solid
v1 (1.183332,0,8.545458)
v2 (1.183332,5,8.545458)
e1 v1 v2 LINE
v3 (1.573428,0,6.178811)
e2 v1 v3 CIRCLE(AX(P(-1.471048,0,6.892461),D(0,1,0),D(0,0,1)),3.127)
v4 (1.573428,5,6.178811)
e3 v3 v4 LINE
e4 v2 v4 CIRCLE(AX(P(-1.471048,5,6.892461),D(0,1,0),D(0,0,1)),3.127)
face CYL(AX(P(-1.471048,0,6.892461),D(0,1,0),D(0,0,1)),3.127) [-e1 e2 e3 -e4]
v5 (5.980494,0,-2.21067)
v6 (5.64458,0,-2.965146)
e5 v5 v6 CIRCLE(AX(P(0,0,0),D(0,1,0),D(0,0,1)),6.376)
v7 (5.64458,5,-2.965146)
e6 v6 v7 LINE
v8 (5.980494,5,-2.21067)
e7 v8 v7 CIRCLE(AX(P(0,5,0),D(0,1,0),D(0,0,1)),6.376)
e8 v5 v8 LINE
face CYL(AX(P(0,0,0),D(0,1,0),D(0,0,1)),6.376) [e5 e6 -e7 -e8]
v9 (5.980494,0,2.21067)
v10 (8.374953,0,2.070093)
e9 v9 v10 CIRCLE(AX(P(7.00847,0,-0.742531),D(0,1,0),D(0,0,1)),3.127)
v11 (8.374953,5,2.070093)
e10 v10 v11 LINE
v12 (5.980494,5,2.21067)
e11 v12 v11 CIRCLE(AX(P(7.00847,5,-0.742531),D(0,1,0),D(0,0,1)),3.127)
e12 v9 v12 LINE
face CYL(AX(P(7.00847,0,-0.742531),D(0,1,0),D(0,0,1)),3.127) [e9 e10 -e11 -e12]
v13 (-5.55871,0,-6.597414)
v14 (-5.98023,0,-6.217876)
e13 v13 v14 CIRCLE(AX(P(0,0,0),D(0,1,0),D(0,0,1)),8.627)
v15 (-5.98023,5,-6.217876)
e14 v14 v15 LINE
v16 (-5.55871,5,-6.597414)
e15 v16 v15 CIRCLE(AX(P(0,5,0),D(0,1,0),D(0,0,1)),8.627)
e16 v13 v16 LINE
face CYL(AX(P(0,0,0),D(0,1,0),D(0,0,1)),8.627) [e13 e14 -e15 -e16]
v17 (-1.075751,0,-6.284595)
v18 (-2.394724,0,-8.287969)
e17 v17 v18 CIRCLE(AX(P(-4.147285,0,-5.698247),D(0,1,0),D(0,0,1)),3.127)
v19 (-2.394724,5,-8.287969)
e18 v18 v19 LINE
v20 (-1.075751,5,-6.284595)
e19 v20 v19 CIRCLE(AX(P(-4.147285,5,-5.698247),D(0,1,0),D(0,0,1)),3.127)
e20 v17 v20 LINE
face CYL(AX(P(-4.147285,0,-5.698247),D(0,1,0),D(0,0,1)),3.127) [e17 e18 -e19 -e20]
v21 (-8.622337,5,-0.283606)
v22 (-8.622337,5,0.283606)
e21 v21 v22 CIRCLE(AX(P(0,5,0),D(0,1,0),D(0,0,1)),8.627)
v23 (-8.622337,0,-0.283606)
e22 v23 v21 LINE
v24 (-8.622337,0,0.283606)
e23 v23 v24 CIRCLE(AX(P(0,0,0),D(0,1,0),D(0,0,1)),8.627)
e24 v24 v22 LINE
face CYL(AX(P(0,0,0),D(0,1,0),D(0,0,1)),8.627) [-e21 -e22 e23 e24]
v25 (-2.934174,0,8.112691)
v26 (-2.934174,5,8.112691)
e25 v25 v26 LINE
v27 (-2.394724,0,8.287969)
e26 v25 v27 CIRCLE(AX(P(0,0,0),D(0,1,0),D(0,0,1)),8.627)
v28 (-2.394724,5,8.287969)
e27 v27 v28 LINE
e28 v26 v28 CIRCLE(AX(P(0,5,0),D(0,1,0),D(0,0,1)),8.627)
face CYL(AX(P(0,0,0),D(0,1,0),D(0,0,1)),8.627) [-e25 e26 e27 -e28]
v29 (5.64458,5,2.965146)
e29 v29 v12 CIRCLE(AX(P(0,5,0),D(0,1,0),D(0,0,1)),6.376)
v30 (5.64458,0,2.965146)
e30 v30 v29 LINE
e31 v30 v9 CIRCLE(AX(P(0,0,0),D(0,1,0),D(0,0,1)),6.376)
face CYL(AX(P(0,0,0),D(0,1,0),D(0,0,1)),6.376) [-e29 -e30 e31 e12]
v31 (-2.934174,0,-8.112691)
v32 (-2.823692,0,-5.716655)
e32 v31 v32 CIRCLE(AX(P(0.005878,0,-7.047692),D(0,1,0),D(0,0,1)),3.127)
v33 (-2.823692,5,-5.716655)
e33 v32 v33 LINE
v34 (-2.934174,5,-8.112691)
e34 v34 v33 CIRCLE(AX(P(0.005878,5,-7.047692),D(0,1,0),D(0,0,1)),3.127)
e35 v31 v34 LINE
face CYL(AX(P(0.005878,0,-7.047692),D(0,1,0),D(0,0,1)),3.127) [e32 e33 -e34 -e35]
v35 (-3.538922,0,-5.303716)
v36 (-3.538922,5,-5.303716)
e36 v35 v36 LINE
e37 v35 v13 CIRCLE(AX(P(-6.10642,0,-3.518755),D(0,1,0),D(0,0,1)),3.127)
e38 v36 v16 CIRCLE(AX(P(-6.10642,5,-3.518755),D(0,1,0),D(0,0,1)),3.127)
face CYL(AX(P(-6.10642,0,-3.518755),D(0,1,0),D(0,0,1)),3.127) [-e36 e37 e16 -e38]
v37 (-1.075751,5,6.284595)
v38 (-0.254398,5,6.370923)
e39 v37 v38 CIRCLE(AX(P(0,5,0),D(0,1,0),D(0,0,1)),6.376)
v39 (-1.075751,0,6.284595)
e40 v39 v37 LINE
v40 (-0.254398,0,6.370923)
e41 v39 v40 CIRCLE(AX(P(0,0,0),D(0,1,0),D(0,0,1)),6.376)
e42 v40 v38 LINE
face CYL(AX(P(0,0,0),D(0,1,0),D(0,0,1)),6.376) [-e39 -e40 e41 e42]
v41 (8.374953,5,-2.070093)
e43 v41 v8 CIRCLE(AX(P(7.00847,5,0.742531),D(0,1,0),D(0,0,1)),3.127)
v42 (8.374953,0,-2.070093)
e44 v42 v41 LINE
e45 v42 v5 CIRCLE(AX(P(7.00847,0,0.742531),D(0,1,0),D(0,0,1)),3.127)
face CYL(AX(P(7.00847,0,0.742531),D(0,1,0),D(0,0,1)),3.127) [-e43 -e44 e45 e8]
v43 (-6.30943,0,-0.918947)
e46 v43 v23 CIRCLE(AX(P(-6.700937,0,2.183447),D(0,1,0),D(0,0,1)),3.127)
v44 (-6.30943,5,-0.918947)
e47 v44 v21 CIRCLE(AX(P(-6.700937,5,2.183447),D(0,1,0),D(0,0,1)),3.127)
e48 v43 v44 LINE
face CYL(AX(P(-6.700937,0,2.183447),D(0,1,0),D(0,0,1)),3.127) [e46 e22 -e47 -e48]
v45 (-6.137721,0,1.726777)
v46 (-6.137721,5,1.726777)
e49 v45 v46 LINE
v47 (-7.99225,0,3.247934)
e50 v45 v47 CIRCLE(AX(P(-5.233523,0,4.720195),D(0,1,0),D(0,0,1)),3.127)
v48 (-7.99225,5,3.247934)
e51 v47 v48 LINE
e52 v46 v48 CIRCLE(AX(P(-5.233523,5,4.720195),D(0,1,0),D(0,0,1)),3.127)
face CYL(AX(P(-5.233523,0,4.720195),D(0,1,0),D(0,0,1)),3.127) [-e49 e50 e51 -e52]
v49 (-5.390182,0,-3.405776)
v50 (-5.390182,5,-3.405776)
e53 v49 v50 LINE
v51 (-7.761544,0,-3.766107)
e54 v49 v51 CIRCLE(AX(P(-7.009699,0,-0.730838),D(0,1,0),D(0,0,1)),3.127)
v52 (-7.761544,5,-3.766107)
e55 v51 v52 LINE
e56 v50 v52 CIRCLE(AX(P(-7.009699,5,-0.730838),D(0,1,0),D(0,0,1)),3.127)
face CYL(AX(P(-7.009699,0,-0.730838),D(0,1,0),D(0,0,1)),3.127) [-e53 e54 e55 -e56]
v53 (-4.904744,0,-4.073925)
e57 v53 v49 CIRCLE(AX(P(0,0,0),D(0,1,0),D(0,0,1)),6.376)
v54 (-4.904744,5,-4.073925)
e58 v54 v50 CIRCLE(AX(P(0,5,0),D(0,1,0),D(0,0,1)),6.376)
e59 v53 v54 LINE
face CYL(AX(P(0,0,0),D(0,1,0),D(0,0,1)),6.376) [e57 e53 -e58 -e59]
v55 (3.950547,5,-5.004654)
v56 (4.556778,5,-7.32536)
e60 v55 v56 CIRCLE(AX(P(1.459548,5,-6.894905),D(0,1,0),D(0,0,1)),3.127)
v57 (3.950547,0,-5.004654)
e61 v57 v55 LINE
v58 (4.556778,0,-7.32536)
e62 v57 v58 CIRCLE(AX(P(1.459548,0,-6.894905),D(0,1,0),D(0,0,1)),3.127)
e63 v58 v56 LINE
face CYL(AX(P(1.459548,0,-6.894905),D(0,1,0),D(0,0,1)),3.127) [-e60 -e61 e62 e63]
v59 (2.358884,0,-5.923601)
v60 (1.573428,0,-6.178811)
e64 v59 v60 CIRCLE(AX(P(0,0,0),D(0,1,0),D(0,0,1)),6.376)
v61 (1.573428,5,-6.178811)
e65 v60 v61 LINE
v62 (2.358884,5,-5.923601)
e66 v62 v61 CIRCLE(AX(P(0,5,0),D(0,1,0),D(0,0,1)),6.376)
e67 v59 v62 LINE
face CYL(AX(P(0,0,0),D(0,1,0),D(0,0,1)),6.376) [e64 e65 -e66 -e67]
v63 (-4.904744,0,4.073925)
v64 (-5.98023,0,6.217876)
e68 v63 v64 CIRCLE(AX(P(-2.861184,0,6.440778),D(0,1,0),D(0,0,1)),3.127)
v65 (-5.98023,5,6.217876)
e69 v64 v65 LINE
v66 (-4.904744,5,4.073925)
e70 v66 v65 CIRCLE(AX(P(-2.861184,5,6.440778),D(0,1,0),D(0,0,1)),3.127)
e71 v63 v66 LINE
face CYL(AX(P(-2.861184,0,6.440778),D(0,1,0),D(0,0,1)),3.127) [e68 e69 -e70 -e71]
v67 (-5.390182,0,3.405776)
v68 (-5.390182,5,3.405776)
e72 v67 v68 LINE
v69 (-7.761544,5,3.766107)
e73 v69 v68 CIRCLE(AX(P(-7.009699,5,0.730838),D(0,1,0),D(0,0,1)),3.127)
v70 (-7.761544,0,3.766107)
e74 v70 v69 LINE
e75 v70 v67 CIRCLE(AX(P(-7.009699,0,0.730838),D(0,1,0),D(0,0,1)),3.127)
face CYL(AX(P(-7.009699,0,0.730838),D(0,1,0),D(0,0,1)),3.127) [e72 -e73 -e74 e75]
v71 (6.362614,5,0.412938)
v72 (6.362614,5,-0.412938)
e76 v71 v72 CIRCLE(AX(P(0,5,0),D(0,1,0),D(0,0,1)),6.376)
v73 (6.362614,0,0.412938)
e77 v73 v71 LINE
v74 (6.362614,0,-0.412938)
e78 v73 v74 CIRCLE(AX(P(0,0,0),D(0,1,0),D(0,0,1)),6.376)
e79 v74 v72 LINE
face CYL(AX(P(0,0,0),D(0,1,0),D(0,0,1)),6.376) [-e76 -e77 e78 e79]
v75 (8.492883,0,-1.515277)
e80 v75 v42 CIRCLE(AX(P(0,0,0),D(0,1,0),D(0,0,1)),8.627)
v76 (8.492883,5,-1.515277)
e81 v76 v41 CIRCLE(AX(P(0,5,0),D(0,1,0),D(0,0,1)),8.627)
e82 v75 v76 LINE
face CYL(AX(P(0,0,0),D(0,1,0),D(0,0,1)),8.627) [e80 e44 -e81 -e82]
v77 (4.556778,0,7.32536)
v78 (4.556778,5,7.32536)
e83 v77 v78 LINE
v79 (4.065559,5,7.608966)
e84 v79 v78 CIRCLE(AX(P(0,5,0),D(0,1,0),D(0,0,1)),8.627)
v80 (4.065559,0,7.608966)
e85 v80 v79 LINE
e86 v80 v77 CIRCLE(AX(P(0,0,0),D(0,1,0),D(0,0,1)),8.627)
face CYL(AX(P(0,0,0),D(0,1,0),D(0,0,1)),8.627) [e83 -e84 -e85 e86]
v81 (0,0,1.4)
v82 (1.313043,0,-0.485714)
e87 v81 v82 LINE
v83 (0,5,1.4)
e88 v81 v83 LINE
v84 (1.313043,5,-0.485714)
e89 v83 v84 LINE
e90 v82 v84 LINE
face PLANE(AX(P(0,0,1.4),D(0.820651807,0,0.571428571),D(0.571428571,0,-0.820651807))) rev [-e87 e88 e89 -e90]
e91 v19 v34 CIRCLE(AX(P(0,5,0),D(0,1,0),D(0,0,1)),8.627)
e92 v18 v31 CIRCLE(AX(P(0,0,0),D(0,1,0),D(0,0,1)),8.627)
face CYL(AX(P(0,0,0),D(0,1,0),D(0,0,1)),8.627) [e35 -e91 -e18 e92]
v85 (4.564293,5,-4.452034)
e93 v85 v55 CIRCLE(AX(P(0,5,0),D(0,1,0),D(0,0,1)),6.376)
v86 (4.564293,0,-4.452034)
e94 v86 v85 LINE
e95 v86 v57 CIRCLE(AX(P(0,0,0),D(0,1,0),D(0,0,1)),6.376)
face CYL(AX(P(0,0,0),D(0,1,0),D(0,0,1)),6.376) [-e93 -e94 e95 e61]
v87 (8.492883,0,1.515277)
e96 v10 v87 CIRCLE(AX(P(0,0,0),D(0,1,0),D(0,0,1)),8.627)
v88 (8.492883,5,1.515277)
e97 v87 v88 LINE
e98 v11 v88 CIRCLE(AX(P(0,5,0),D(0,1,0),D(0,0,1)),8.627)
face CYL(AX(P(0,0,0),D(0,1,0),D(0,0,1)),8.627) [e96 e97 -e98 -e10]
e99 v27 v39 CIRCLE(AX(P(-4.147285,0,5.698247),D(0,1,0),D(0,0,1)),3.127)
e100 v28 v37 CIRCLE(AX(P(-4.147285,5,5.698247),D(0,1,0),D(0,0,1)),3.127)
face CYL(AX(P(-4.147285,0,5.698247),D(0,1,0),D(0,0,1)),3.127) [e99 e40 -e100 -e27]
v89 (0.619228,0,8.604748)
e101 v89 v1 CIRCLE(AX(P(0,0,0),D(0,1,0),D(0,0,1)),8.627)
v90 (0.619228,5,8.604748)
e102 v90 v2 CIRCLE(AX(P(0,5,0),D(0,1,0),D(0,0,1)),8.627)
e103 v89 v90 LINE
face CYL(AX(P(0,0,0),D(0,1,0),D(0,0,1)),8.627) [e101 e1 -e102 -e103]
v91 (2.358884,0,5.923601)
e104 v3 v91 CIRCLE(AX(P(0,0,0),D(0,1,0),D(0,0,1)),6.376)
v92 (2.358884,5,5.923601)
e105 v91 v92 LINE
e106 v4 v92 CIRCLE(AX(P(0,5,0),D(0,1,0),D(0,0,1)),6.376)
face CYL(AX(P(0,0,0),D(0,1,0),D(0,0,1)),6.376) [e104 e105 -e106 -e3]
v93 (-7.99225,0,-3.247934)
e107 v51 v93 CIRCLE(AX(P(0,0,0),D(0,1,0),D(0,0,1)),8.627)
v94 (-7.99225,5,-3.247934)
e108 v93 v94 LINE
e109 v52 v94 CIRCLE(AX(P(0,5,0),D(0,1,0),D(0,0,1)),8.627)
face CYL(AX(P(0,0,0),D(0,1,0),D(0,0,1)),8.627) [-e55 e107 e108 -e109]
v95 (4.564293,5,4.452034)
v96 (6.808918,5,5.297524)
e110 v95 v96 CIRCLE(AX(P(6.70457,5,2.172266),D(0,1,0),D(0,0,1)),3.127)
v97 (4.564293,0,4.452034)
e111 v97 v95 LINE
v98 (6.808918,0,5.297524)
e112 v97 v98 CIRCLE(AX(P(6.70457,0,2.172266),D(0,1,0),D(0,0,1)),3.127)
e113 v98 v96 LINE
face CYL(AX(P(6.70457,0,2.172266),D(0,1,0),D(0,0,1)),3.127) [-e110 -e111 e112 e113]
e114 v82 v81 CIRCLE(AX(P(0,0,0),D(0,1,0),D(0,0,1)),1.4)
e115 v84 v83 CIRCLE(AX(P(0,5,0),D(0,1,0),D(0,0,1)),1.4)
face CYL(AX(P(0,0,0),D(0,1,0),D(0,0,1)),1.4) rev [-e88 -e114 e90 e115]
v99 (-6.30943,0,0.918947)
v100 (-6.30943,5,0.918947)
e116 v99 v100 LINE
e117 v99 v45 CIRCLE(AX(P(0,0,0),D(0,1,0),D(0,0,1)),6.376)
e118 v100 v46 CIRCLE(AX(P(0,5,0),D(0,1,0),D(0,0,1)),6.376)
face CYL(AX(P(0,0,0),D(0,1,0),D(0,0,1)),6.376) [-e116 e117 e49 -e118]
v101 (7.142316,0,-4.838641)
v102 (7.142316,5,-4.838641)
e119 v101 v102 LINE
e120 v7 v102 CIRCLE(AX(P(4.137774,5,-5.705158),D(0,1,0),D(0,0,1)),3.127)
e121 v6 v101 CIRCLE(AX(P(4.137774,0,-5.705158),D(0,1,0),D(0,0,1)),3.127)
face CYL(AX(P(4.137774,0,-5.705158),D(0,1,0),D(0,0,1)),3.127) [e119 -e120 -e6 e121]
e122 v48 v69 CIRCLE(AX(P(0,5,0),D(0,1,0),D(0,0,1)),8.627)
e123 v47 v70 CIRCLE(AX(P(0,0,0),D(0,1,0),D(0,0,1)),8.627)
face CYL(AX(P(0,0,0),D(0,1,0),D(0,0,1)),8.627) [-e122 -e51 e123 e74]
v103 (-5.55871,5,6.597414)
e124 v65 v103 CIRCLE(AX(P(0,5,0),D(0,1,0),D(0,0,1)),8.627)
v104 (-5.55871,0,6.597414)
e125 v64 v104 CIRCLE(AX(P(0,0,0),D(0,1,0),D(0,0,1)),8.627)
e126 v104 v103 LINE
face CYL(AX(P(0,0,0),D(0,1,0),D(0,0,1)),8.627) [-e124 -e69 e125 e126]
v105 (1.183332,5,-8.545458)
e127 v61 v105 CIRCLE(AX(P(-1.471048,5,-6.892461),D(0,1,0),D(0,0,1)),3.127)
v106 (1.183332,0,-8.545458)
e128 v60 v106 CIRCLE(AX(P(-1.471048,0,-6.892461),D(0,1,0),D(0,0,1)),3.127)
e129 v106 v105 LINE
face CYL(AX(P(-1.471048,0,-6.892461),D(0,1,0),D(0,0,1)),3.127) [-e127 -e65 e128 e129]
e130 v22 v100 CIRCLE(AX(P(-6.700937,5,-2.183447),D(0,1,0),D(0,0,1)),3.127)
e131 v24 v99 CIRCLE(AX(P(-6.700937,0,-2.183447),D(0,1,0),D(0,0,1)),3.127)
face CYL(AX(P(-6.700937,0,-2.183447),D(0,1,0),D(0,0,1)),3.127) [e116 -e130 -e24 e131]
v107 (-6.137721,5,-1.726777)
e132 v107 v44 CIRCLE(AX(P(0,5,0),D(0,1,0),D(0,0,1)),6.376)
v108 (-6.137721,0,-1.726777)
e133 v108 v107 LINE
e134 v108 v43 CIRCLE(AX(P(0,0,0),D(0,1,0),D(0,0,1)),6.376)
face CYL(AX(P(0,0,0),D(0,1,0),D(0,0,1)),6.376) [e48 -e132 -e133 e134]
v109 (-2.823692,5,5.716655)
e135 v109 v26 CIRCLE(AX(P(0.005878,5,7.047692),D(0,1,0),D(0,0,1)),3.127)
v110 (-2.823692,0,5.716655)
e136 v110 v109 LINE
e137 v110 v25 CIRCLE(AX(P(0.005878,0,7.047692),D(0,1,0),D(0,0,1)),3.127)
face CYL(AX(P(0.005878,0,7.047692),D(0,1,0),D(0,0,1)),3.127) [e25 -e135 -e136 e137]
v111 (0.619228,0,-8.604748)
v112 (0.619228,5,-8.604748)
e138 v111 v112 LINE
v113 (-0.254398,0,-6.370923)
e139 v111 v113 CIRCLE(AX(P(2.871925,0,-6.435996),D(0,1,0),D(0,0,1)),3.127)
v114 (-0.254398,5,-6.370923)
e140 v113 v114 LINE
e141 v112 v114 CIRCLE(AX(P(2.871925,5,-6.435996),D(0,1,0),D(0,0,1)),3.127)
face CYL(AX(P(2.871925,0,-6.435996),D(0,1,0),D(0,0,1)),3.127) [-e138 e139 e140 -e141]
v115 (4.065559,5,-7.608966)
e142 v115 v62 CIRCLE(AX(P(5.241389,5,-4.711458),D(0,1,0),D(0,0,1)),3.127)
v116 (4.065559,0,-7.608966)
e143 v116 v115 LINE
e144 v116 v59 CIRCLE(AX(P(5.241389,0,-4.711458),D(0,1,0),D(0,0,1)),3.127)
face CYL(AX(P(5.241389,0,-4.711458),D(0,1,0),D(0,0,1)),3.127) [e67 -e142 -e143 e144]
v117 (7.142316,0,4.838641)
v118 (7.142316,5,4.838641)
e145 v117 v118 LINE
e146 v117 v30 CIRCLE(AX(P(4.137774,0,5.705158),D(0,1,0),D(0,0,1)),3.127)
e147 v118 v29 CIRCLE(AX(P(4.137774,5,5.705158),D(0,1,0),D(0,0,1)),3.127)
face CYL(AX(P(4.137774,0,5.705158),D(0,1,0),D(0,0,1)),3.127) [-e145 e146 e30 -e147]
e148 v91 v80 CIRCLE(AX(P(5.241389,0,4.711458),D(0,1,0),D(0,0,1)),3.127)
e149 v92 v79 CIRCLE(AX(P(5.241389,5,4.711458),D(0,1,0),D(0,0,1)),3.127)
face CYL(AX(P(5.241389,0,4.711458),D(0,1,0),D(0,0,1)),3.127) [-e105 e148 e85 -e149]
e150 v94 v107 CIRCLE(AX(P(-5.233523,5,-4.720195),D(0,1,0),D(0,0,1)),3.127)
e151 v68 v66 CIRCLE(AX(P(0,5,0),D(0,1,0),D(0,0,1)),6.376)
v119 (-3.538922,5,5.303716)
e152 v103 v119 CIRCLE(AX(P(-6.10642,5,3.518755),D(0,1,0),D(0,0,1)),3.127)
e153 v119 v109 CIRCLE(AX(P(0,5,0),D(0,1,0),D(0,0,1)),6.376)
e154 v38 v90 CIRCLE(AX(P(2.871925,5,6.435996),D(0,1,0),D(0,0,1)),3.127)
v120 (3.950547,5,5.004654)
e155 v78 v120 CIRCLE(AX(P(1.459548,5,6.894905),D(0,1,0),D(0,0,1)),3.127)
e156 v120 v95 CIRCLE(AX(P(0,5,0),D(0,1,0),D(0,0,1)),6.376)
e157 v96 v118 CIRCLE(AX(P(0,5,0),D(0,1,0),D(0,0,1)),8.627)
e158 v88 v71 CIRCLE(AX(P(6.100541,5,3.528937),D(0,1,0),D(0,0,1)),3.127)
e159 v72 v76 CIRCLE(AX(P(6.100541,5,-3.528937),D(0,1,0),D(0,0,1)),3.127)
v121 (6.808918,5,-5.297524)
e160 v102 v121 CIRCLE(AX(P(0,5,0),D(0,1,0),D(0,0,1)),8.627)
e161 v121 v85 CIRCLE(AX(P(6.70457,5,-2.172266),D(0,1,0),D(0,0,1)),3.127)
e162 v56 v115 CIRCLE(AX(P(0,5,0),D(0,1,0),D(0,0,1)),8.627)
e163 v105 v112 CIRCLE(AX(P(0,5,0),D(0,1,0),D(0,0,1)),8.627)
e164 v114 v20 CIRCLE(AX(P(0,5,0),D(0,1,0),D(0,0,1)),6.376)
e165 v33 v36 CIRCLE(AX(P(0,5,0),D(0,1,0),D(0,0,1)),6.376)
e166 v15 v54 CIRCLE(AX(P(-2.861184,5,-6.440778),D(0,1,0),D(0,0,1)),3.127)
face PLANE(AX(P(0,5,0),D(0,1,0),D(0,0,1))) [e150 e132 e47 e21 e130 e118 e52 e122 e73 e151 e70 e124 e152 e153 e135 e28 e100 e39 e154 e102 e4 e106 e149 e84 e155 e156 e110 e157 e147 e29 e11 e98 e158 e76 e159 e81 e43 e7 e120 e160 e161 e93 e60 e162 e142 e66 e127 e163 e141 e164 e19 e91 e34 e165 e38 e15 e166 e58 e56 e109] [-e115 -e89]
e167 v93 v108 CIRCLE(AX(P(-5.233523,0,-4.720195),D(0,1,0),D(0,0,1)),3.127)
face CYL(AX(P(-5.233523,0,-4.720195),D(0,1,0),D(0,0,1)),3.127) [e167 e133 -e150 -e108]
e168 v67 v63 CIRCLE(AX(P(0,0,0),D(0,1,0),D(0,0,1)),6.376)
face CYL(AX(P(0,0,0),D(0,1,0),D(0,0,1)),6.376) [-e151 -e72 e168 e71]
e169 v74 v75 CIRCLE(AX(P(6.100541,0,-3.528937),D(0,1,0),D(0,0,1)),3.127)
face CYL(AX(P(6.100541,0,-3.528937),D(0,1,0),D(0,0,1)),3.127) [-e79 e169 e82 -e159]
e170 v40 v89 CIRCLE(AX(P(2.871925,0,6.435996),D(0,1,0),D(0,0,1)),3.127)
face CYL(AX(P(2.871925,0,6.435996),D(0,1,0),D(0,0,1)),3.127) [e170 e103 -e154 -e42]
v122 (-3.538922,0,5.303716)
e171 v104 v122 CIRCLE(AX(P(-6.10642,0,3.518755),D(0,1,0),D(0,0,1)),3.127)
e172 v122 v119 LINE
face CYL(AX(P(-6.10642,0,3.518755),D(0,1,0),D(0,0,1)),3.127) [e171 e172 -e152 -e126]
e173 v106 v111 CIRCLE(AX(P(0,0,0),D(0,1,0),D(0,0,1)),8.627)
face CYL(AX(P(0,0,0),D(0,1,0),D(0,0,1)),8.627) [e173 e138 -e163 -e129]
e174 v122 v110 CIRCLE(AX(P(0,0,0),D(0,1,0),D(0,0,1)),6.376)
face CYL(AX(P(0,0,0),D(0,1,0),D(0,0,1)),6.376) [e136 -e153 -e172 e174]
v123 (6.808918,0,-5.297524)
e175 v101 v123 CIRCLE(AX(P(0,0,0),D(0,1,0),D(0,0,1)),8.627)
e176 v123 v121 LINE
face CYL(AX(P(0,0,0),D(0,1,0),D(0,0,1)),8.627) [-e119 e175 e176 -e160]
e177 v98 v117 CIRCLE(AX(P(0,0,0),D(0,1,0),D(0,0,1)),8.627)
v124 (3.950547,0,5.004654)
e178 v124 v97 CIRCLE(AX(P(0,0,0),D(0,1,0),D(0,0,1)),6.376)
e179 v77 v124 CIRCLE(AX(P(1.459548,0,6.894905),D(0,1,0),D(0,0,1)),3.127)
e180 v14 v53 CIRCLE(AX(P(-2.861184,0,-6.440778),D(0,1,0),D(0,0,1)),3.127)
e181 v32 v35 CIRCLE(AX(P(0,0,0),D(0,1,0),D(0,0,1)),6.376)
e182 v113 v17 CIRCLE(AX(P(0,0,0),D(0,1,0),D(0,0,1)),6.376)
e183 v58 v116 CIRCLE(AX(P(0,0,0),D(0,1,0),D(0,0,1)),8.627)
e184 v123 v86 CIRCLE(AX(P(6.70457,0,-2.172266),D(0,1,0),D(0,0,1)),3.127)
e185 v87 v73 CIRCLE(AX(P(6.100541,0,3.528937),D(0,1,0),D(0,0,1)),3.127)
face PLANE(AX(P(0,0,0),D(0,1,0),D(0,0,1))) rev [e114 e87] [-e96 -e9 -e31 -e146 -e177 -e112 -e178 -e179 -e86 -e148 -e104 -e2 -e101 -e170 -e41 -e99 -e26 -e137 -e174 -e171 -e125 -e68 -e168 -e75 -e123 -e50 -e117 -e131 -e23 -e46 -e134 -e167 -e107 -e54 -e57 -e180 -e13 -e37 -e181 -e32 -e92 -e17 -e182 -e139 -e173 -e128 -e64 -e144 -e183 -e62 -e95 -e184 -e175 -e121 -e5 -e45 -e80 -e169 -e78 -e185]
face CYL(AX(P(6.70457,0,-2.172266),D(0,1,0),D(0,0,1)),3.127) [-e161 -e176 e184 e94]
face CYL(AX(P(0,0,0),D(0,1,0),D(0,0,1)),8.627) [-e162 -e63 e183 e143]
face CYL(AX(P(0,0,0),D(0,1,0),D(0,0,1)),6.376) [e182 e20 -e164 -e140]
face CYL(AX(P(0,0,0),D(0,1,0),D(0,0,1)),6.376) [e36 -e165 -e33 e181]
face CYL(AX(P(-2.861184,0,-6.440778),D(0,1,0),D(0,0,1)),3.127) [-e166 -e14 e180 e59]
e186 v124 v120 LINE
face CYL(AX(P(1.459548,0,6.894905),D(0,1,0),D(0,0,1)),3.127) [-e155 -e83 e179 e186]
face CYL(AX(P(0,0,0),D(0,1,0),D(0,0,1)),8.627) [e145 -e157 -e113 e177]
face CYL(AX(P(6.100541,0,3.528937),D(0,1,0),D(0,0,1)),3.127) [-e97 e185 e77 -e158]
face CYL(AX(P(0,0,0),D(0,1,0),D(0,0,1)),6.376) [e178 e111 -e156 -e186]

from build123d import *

# Parameters (mm, degrees)
SKETCH1_R           = 56.531668112
BOSS_EXTRUDE1_DEPTH = 5
SKETCH2_R           = 93.360470672
CUT_EXTRUDE1_DEPTH  = 83.481553238
CUT_EXTRUDE2_DEPTH  = 93.989824493


with BuildPart() as part:
    # Sketch1 → Boss-Extrude1 (new body)
    with BuildSketch(Plane(origin=(0, 0, 0), x_dir=(1, 0, 0), z_dir=(0, 1, 0))):
        Circle(SKETCH1_R)
    extrude(amount=BOSS_EXTRUDE1_DEPTH)

    # Sketch2 → Cut-Extrude1 (cut, through all)
    with BuildSketch(Plane(origin=(0.053951493, 9.696123263, -2.690451675), x_dir=(0, 0, 1), z_dir=(0, 1, 0))):
        with Locations((2.690451675, -0.053951493)):
            Circle(SKETCH2_R)
        with BuildLine():
            ThreePointArc((7.987976033, 6.754966533), (7.789005891, 5.548363877), (7.142485611, 4.510341424))
            ThreePointArc((7.142485611, 4.510341424), (7.428743082, 4.212425253), (7.695105184, 3.89659521))
            ThreePointArc((7.695105184, 3.89659521), (8.795021012, 4.431070894), (10.015811815, 4.502826734))
            ThreePointArc((10.015811815, 4.502826734), (10.161652833, 4.259548507), (10.299417449, 4.011607367))
            ThreePointArc((10.299417449, 4.011607367), (9.626879667, 2.990249439), (8.614052233, 2.304932231))
            ThreePointArc((8.614052233, 2.304932231), (8.754388023, 1.916340863), (8.869262259, 1.519476535))
            ThreePointArc((8.869262259, 1.519476535), (10.091476214, 1.560368296), (11.235909836, 1.129380165))
            ThreePointArc((11.235909836, 1.129380165), (11.270192066, 0.84781556), (11.295199558, 0.56527614))
            ThreePointArc((11.295199558, 0.56527614), (10.265382027, -0.094234996), (9.061374505, -0.308349388))
            ThreePointArc((9.061374505, -0.308349388), (9.03152328, -0.720424975), (8.975046852, -1.12970214))
            ThreePointArc((8.975046852, -1.12970214), (10.108227036, -1.589464859), (10.978420508, -2.448675198))
            ThreePointArc((10.978420508, -2.448675198), (10.895216241, -2.719841104), (10.803142587, -2.98812517))
            ThreePointArc((10.803142587, -2.98812517), (9.594110113, -3.171754047), (8.407106342, -2.8776433))
            ThreePointArc((8.407106342, -2.8776433), (8.212229649, -3.241951493), (7.994167845, -3.592873756))
            ThreePointArc((7.994167845, -3.592873756), (8.84237711, -4.473793803), (9.287866075, -5.612661077))
            ThreePointArc((9.287866075, -5.612661077), (9.101562084, -5.826541234), (8.908327655, -6.034181196))
            ThreePointArc((8.908327655, -6.034181196), (7.729132938, -5.710176712), (6.764376652, -4.958695246))
            ThreePointArc((6.764376652, -4.958695246), (6.438170443, -5.212243849), (6.09622813, -5.444133562))
            ThreePointArc((6.09622813, -5.444133562), (6.512803388, -6.593891859), (6.456558756, -7.81549557))
            ThreePointArc((6.456558756, -7.81549557), (6.199368695, -7.935108156), (5.938385479, -8.046201177))
            ThreePointArc((5.938385479, -8.046201177), (4.992921997, -7.270586652), (4.417228324, -6.191672439))
            ThreePointArc((4.417228324, -6.191672439), (4.016096616, -6.290620595), (3.609398725, -6.363381921))
            ThreePointArc((3.609398725, -6.363381921), (3.52231033, -7.583174812), (2.974057309, -8.67628858))
            ThreePointArc((2.974057309, -8.67628858), (2.690451675, -8.680951493), (2.406846041, -8.67628858))
            ThreePointArc((2.406846041, -8.67628858), (1.85859302, -7.583174812), (1.771504625, -6.363381921))
            ThreePointArc((1.771504625, -6.363381921), (1.364806734, -6.290620595), (0.963675026, -6.191672439))
            ThreePointArc((0.963675026, -6.191672439), (0.387981353, -7.270586652), (-0.557482129, -8.046201177))
            ThreePointArc((-0.557482129, -8.046201177), (-0.818465345, -7.935108156), (-1.075655406, -7.81549557))
            ThreePointArc((-1.075655406, -7.81549557), (-1.131900038, -6.593891859), (-0.71532478, -5.444133562))
            ThreePointArc((-0.71532478, -5.444133562), (-1.057267094, -5.212243849), (-1.383473303, -4.958695246))
            ThreePointArc((-1.383473303, -4.958695246), (-2.348229588, -5.710176712), (-3.527424305, -6.034181196))
            ThreePointArc((-3.527424305, -6.034181196), (-3.720658735, -5.826541234), (-3.906962725, -5.612661077))
            ThreePointArc((-3.906962725, -5.612661077), (-3.46147376, -4.473793803), (-2.613264496, -3.592873756))
            ThreePointArc((-2.613264496, -3.592873756), (-2.8313263, -3.241951493), (-3.026202992, -2.8776433))
            ThreePointArc((-3.026202992, -2.8776433), (-4.213206764, -3.171754047), (-5.422239237, -2.98812517))
            ThreePointArc((-5.422239237, -2.98812517), (-5.514312891, -2.719841104), (-5.597517158, -2.448675198))
            ThreePointArc((-5.597517158, -2.448675198), (-4.727323686, -1.589464859), (-3.594143503, -1.12970214))
            ThreePointArc((-3.594143503, -1.12970214), (-3.65061993, -0.720424975), (-3.680471156, -0.308349388))
            ThreePointArc((-3.680471156, -0.308349388), (-4.884478677, -0.094234996), (-5.914296209, 0.56527614))
            ThreePointArc((-5.914296209, 0.56527614), (-5.889288716, 0.84781556), (-5.855006486, 1.129380165))
            ThreePointArc((-5.855006486, 1.129380165), (-4.710572864, 1.560368296), (-3.48835891, 1.519476535))
            ThreePointArc((-3.48835891, 1.519476535), (-3.373484673, 1.916340863), (-3.233148884, 2.304932231))
            ThreePointArc((-3.233148884, 2.304932231), (-4.245976317, 2.990249439), (-4.9185141, 4.011607367))
            ThreePointArc((-4.9185141, 4.011607367), (-4.780749484, 4.259548507), (-4.634908466, 4.502826734))
            ThreePointArc((-4.634908466, 4.502826734), (-3.414117662, 4.431070894), (-2.314201834, 3.89659521))
            ThreePointArc((-2.314201834, 3.89659521), (-2.047839732, 4.212425253), (-1.761582261, 4.510341424))
            ThreePointArc((-1.761582261, 4.510341424), (-2.408102542, 5.548363877), (-2.607072683, 6.754966533))
            ThreePointArc((-2.607072683, 6.754966533), (-2.380371697, 6.925438117), (-2.148189128, 7.088364951))
            ThreePointArc((-2.148189128, 7.088364951), (-1.062126964, 6.526272375), (-0.274694701, 5.590628471))
            ThreePointArc((-0.274694701, 5.590628471), (0.097098839, 5.770814345), (0.479781475, 5.926542907))
            ThreePointArc((0.479781475, 5.926542907), (0.311357577, 7.137787092), (0.620358822, 8.321001915))
            ThreePointArc((0.620358822, 8.321001915), (0.896797518, 8.384527858), (1.175175163, 8.438931768))
            ThreePointArc((1.175175163, 8.438931768), (1.938718671, 7.483693371), (2.277513178, 6.308662576))
            ThreePointArc((2.277513178, 6.308662576), (2.690451675, 6.322048507), (3.103390171, 6.308662576))
            ThreePointArc((3.103390171, 6.308662576), (3.442184678, 7.483693371), (4.205728187, 8.438931768))
            ThreePointArc((4.205728187, 8.438931768), (4.484105832, 8.384527858), (4.760544528, 8.321001915))
            ThreePointArc((4.760544528, 8.321001915), (5.069545773, 7.137787092), (4.901121875, 5.926542907))
            ThreePointArc((4.901121875, 5.926542907), (5.283804511, 5.770814345), (5.65559805, 5.590628471))
            ThreePointArc((5.65559805, 5.590628471), (6.443030314, 6.526272375), (7.529092477, 7.088364951))
            ThreePointArc((7.529092477, 7.088364951), (7.761275046, 6.925438117), (7.987976033, 6.754966533))
        make_face(mode=Mode.SUBTRACT)
    extrude(amount=-CUT_EXTRUDE1_DEPTH, mode=Mode.SUBTRACT)

    # Sketch4 → Cut-Extrude2 (cut, through all)
    with BuildSketch(Plane(origin=(64.693992366, 5.1354, -48.358110231), x_dir=(1, 0, 0), z_dir=(0, 1, 0))):
        with BuildLine():
            Line((-64.693992366, -49.758110231), (-63.380949475, -47.872395945))
            ThreePointArc((-63.380949475, -47.872395945), (-65.842904895, -47.558110231), (-64.693992366, -49.758110231))
        make_face()
    extrude(amount=-CUT_EXTRUDE2_DEPTH, mode=Mode.SUBTRACT)


solid = part.part
